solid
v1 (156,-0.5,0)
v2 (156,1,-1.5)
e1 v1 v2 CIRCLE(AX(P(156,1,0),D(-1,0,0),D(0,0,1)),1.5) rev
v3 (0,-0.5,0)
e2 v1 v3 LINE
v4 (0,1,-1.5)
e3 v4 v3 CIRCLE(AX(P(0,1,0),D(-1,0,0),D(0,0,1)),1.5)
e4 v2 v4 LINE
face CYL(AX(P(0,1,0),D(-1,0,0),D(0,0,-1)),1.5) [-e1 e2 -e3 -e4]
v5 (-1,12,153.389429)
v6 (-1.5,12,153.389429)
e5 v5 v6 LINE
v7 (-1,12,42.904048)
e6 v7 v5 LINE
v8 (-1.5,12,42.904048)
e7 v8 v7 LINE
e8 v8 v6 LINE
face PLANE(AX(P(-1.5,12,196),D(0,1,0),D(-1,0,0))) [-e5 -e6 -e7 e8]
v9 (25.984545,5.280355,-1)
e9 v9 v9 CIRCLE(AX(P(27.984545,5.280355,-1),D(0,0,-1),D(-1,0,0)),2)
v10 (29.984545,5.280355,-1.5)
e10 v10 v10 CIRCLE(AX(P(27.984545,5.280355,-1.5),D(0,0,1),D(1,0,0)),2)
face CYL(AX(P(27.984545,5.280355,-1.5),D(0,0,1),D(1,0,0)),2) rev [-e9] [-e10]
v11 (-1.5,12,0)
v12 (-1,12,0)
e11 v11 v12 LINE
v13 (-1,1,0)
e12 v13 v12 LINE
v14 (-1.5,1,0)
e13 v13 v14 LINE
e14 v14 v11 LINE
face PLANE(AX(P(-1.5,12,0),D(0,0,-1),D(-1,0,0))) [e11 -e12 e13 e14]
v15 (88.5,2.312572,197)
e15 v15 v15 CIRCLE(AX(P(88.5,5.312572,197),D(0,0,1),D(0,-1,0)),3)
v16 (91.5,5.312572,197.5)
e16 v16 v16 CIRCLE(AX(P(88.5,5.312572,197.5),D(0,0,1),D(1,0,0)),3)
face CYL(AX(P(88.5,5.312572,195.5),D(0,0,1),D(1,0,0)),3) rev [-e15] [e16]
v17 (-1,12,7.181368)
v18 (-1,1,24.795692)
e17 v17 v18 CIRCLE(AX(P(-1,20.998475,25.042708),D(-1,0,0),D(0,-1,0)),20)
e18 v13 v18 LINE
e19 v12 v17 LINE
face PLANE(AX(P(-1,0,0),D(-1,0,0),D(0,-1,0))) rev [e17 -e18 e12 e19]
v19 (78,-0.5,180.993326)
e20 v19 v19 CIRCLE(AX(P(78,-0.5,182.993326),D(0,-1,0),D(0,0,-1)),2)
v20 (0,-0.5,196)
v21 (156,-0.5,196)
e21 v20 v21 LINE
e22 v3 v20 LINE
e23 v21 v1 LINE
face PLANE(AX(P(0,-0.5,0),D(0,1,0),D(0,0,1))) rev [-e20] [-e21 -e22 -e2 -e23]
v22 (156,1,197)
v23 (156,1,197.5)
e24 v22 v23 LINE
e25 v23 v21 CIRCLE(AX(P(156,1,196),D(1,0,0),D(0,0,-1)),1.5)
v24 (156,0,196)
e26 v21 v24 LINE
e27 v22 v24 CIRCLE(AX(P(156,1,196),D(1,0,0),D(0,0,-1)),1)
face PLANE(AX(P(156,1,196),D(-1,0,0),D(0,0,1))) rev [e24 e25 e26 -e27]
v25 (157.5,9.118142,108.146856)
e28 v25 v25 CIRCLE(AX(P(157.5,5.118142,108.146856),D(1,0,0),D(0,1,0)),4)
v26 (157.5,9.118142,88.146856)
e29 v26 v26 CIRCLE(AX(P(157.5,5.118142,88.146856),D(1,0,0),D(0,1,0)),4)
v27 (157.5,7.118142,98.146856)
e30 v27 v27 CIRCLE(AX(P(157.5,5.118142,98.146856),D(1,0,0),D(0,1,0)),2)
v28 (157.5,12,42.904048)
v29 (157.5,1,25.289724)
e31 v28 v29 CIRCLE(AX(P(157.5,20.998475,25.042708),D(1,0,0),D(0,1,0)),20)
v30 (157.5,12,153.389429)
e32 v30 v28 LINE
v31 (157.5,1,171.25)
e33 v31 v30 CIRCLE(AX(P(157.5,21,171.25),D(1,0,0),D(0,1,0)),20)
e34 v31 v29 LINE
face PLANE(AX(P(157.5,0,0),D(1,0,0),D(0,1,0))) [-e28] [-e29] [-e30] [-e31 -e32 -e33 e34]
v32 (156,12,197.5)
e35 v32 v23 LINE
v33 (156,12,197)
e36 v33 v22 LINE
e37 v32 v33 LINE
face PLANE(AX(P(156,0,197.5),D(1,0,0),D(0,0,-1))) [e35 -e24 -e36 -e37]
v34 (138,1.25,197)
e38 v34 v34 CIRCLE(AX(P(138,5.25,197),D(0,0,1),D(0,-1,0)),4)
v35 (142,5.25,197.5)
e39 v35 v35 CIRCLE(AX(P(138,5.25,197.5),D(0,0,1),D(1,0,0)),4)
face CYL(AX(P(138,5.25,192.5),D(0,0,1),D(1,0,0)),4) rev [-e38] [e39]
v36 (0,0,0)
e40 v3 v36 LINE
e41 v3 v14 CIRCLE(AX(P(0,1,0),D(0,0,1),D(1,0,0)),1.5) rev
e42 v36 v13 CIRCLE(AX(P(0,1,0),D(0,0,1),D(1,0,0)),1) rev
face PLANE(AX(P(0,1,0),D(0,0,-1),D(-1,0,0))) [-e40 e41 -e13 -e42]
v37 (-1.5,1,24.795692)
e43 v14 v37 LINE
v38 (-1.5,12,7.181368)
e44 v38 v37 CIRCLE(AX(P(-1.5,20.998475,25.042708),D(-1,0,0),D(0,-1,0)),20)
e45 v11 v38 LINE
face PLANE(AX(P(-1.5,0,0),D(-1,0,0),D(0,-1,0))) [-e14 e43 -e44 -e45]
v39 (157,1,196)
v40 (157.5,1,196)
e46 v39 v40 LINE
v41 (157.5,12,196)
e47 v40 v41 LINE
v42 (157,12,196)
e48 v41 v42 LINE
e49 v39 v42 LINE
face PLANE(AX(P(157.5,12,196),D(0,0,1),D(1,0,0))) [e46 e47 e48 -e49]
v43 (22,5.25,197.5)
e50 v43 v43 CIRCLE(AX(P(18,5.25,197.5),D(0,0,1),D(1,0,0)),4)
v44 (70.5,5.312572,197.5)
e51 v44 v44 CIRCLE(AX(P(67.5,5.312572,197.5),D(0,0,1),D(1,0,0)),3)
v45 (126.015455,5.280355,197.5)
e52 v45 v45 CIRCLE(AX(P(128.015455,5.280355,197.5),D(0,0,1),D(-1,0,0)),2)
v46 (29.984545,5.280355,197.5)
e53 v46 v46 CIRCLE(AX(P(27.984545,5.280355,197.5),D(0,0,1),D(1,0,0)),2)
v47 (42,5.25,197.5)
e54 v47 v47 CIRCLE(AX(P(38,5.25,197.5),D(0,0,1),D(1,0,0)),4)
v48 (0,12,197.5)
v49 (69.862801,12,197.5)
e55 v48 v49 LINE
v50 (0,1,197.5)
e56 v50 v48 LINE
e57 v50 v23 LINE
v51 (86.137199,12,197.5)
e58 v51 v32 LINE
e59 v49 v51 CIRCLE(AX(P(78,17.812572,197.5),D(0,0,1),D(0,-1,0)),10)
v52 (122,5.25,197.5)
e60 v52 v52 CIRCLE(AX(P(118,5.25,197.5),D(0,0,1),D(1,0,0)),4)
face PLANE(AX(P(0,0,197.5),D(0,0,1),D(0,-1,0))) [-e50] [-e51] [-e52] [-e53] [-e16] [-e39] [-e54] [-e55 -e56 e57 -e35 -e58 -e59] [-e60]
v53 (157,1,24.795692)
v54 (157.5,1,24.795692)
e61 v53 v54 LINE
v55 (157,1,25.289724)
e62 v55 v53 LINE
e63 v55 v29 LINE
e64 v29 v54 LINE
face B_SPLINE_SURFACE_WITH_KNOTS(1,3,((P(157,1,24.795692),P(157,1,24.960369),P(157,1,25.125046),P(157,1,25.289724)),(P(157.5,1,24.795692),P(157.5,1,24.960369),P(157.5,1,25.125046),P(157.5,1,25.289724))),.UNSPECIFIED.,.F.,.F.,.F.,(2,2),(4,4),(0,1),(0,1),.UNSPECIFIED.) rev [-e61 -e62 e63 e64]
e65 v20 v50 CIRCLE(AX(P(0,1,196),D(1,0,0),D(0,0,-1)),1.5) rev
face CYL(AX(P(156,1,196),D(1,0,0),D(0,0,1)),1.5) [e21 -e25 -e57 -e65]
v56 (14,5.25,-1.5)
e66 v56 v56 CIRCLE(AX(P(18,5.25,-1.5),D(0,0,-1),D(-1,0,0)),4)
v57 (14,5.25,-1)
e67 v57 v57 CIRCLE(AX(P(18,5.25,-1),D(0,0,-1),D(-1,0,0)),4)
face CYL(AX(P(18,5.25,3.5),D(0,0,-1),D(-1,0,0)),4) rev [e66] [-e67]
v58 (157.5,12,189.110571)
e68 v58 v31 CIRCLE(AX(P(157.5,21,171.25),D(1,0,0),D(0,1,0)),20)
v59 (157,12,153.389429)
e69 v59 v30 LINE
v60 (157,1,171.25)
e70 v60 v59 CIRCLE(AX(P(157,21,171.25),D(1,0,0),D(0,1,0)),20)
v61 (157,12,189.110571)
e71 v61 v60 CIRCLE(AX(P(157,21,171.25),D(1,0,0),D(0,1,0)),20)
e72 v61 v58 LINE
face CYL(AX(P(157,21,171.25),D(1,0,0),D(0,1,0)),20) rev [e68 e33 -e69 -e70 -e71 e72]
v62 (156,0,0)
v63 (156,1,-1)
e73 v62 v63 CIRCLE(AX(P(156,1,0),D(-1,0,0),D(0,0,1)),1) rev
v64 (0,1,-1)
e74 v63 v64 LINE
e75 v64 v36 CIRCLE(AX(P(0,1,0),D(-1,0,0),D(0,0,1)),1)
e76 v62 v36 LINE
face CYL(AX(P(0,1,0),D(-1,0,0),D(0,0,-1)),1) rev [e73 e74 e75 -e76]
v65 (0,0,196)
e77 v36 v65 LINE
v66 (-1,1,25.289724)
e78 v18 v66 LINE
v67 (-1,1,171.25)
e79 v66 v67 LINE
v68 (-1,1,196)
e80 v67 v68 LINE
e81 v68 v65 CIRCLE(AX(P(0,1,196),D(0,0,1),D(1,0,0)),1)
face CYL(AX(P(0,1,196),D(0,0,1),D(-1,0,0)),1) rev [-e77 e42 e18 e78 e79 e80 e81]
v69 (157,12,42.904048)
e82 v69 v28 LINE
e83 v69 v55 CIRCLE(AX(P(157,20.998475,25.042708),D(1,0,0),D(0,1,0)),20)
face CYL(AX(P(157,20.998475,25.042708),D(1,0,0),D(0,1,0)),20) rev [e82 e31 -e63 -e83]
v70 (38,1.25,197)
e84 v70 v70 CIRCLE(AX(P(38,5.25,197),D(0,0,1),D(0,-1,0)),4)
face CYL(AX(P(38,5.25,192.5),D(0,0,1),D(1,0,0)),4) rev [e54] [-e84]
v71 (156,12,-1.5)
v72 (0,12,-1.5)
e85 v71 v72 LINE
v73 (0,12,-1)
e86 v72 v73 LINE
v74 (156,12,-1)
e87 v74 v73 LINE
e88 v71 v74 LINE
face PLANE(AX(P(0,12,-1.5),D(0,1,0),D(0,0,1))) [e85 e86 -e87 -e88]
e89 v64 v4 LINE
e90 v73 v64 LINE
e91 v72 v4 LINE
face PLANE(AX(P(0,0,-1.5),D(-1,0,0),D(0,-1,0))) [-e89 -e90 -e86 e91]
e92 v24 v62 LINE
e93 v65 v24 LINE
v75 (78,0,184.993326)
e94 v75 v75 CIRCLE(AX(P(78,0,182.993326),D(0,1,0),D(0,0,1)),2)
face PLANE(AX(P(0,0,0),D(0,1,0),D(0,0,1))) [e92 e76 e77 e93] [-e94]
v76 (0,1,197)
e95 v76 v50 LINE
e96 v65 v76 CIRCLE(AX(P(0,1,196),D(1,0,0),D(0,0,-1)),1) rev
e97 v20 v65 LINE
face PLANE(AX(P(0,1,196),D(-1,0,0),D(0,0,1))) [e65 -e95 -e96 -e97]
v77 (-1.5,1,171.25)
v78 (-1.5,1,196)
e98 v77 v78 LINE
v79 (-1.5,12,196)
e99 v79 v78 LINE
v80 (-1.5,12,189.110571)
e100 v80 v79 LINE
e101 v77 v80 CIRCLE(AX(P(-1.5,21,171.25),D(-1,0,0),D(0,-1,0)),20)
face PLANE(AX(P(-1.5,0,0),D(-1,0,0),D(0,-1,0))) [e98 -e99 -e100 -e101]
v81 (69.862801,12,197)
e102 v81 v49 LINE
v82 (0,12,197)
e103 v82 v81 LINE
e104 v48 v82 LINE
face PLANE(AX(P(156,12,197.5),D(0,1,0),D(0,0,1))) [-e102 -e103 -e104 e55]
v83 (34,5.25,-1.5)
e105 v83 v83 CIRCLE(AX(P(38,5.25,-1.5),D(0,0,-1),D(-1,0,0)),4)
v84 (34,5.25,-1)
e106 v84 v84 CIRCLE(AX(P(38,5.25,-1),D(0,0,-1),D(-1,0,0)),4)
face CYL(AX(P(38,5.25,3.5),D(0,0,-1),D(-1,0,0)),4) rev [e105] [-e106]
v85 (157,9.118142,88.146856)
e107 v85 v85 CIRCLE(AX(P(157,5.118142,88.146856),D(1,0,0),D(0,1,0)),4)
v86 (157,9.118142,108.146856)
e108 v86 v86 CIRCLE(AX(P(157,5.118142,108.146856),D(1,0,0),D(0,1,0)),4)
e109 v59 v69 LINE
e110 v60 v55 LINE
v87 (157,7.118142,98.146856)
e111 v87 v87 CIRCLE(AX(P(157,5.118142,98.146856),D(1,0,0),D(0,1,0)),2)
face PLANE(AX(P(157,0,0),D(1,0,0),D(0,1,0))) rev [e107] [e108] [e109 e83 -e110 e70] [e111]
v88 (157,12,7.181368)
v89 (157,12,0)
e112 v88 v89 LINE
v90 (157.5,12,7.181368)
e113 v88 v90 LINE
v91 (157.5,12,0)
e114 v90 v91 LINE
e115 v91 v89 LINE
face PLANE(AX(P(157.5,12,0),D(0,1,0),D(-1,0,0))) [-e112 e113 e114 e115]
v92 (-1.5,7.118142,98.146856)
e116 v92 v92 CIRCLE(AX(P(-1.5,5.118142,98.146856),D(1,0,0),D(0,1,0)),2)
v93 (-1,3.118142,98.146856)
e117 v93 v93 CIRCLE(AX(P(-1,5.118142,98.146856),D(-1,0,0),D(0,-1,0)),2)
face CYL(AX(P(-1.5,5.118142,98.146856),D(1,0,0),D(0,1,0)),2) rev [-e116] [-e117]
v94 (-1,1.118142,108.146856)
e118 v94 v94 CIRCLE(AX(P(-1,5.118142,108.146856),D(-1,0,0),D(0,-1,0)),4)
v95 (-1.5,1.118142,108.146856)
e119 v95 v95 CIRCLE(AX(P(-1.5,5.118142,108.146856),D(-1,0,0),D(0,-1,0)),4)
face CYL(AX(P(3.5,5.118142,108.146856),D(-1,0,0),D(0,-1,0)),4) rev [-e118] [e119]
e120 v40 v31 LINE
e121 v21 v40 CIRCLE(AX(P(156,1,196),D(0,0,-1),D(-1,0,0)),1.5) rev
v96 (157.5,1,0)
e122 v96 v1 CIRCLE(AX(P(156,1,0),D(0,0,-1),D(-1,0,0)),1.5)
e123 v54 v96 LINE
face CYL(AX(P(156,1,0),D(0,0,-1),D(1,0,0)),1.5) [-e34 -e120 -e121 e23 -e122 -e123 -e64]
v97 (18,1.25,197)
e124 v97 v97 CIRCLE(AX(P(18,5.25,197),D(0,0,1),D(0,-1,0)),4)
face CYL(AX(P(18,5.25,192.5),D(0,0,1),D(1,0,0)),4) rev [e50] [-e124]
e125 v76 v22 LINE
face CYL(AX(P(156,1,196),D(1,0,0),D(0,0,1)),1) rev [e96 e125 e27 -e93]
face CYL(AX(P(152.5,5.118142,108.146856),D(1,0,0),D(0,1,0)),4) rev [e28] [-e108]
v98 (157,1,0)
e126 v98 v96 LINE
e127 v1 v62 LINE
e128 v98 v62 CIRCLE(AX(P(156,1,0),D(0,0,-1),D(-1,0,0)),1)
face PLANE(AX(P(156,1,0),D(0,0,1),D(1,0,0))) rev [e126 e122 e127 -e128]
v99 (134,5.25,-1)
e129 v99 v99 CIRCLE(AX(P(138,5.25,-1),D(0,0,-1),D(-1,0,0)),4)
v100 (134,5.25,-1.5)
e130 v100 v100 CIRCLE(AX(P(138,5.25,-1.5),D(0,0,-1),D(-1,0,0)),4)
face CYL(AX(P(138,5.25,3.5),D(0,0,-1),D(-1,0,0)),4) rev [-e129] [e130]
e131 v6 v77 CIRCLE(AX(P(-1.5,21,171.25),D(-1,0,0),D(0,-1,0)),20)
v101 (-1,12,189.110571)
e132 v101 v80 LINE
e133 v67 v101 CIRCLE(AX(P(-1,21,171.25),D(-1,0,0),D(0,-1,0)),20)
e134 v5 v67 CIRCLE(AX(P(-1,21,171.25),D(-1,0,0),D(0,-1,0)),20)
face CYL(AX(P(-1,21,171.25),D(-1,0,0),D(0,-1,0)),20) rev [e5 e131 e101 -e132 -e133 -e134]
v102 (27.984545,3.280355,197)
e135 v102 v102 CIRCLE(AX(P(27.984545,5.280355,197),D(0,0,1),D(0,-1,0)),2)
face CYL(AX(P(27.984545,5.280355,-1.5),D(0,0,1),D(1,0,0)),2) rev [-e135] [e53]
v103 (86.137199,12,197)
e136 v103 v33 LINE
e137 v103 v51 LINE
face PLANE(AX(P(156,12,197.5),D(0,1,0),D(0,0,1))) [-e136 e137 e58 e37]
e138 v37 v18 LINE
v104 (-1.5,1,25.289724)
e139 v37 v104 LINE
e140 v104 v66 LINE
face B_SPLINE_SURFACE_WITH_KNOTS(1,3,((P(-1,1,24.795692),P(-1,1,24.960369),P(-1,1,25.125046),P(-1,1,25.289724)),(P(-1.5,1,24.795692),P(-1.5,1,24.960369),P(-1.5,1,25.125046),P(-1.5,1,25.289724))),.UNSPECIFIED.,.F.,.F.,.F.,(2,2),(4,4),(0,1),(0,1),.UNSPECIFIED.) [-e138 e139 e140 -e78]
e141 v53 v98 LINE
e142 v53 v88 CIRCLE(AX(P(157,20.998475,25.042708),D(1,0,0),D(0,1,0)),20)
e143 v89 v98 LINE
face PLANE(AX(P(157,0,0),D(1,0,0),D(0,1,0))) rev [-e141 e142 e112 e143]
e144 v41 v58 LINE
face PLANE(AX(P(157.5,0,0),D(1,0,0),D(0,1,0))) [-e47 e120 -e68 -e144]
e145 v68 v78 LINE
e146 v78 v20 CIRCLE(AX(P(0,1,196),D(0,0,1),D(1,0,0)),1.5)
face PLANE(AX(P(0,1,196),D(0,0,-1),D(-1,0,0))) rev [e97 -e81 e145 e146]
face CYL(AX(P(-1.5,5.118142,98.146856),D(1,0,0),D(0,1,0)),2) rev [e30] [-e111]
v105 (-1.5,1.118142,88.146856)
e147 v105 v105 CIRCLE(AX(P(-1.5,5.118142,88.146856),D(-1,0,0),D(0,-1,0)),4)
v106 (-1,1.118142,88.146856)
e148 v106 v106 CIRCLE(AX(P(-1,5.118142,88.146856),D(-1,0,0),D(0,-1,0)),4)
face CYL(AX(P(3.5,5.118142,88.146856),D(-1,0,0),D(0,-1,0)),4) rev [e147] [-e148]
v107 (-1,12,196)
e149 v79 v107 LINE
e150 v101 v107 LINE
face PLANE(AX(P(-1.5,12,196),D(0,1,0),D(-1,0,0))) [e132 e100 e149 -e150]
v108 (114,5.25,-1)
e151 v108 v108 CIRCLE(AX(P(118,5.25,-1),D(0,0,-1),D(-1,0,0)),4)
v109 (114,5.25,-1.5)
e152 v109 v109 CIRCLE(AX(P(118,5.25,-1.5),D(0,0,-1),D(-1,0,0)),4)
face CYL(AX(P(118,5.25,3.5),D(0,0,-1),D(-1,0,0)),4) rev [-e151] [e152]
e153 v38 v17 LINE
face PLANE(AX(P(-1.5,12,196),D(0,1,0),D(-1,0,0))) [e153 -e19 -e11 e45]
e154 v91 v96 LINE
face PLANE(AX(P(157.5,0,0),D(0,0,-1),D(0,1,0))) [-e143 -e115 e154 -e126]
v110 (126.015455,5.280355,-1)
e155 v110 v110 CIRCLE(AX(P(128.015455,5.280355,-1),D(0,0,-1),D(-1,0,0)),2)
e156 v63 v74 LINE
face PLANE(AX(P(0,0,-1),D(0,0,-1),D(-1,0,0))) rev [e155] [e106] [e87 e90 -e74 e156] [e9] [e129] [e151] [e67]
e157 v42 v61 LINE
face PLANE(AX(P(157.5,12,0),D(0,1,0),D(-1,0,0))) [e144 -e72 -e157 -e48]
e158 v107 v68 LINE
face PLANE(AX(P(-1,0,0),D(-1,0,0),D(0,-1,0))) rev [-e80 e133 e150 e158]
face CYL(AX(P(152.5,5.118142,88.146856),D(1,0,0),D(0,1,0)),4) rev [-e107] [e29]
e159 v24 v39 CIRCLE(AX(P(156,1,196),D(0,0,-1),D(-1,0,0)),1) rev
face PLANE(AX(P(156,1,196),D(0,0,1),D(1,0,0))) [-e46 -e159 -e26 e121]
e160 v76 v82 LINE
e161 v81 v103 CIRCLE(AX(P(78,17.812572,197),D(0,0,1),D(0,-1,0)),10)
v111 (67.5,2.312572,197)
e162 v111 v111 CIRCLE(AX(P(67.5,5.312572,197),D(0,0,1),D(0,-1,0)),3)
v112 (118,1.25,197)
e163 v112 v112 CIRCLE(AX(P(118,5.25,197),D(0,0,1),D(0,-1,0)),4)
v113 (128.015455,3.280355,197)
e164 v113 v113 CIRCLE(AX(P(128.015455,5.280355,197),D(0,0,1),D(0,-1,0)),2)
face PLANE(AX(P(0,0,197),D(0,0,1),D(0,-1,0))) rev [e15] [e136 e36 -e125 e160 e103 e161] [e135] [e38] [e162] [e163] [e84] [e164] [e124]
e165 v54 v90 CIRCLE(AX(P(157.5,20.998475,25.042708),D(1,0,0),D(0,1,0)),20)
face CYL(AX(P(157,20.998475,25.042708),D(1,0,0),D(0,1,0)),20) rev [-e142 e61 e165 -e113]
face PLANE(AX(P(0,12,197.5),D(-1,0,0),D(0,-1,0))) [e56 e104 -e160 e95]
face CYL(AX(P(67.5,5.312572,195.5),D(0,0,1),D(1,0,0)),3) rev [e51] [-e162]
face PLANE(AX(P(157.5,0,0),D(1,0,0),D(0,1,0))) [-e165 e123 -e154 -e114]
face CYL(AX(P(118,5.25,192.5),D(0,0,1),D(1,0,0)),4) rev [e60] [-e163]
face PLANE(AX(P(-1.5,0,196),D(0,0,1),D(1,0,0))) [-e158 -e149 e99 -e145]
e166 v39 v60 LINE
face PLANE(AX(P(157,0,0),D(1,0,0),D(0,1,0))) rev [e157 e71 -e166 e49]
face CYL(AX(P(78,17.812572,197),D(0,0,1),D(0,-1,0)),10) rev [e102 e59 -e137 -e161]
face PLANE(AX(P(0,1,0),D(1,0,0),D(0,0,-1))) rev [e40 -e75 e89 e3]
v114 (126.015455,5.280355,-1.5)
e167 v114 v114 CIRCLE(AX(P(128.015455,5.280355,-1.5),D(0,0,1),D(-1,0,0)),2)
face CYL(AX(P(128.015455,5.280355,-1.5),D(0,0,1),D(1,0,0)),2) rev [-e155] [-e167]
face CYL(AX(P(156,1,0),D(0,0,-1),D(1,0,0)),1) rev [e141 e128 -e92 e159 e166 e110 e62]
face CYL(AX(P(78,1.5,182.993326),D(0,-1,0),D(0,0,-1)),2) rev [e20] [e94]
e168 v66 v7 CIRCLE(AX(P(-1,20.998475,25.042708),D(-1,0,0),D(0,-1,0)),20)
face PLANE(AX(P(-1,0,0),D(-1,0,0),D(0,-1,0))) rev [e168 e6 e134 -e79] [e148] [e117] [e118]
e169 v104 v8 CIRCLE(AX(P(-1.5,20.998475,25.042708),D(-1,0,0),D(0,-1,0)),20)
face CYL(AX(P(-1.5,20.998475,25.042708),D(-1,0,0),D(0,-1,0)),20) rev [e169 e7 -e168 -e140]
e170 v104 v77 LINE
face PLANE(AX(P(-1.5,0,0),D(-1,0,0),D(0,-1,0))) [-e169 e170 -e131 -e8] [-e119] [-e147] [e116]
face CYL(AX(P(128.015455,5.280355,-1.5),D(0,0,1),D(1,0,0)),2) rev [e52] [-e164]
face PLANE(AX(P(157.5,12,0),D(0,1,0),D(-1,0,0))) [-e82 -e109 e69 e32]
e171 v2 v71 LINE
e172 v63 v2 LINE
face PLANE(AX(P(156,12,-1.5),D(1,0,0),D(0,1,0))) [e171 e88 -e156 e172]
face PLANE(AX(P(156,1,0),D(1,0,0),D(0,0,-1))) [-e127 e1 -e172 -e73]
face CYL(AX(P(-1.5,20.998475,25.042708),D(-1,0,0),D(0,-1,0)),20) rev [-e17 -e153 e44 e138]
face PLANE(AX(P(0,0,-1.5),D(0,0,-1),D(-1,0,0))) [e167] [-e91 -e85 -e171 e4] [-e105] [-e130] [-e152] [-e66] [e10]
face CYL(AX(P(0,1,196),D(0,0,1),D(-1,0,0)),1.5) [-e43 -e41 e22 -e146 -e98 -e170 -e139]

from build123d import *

# Parameters (mm, degrees)
SKETCH1_W           = 156
SKETCH1_H           = 196
BASE_FLANGE1_DEPTH  = 0.5
EDGE_FLANGE1_DEPTH  = 196
EDGE_FLANGE2_DEPTH  = 156
EDGE_FLANGE3_DEPTH  = 196
EDGE_FLANGE4_DEPTH  = 156
SKETCH14_R          = 3
CUT_EXTRUDE1_DEPTH  = 2
CUT_EXTRUDE2_START  = -0.5
CUT_EXTRUDE2_DEPTH  = 0.5
CUT_EXTRUDE7_START  = -0.5
CUT_EXTRUDE7_DEPTH  = 0.5
SKETCH18_R          = 2
CUT_EXTRUDE8_DEPTH  = 254.83311453
SKETCH19_R          = 2
CUT_EXTRUDE9_DEPTH  = 255.06938035
SKETCH20_R          = 4
CUT_EXTRUDE10_DEPTH = 5
CUT_EXTRUDE11_START = -5
SKETCH21_R          = 4
CUT_EXTRUDE11_DEPTH = 5
SKETCH22_R          = 4
CUT_EXTRUDE12_DEPTH = 5
CUT_EXTRUDE13_START = -5
SKETCH23_R          = 4
CUT_EXTRUDE13_DEPTH = 5
SKETCH24_R          = 10
CUT_EXTRUDE14_DEPTH = 1
SKETCH25_R          = 2
CUT_EXTRUDE15_DEPTH = 2


# Read off the part's stored shape, not the designer's step: Cut-Extrude2, Cut-Extrude7
# Sheet-metal steps are written as plain solids
with BuildPart() as part:
    # Sketch1 → Base-Flange1 (new body)
    with BuildSketch(Plane(origin=(0, 0, 0), x_dir=(1, 0, 0), z_dir=(0, 1, 0))):
        with Locations((78, -98)):
            Rectangle(SKETCH1_W, SKETCH1_H)
    extrude(amount=-BASE_FLANGE1_DEPTH)

    # Edge-Flange1 section (across the edge) → Edge-Flange1 (add)
    with BuildSketch(Plane(origin=(-1, 0, 0), x_dir=(1, 0, 0), z_dir=(0, 0, 1))):
        with BuildLine():
            Line((-0.5, 1), (-0.5, 12))
            Line((-0.5, 12), (0, 12))
            Line((0, 12), (0, 1))
            ThreePointArc((0, 1), (0.292893219, 0.292893219), (1, 0))
            Line((1, 0), (1, -0.5))
            ThreePointArc((1, -0.5), (-0.060660172, -0.060660172), (-0.5, 1))
        make_face()
    extrude(amount=EDGE_FLANGE1_DEPTH)

    # Edge-Flange2 section (across the edge) → Edge-Flange2 (add)
    with BuildSketch(Plane(origin=(0, 0, 197), x_dir=(0, 0, -1), z_dir=(1, 0, 0))):
        with BuildLine():
            Line((-0.5, 1), (-0.5, 12))
            Line((-0.5, 12), (0, 12))
            Line((0, 12), (0, 1))
            ThreePointArc((0, 1), (0.292893219, 0.292893219), (1, 0))
            Line((1, 0), (1, -0.5))
            ThreePointArc((1, -0.5), (-0.060660172, -0.060660172), (-0.5, 1))
        make_face()
    extrude(amount=EDGE_FLANGE2_DEPTH)

    # Edge-Flange3 section (across the edge) → Edge-Flange3 (add)
    with BuildSketch(Plane(origin=(157, 0, 196), x_dir=(-1, 0, 0), z_dir=(0, 0, -1))):
        with BuildLine():
            Line((-0.5, 1), (-0.5, 12))
            Line((-0.5, 12), (0, 12))
            Line((0, 12), (0, 1))
            ThreePointArc((0, 1), (0.292893219, 0.292893219), (1, 0))
            Line((1, 0), (1, -0.5))
            ThreePointArc((1, -0.5), (-0.060660172, -0.060660172), (-0.5, 1))
        make_face()
    extrude(amount=EDGE_FLANGE3_DEPTH)

    # Edge-Flange4 section (across the edge) → Edge-Flange4 (add)
    with BuildSketch(Plane(origin=(156, 0, -1), x_dir=(0, 0, 1), z_dir=(-1, 0, 0))):
        with BuildLine():
            Line((-0.5, 1), (-0.5, 12))
            Line((-0.5, 12), (0, 12))
            Line((0, 12), (0, 1))
            ThreePointArc((0, 1), (0.292893219, 0.292893219), (1, 0))
            Line((1, 0), (1, -0.5))
            ThreePointArc((1, -0.5), (-0.060660172, -0.060660172), (-0.5, 1))
        make_face()
    extrude(amount=EDGE_FLANGE4_DEPTH)

    # Sketch14 → Cut-Extrude1 (cut)
    with BuildSketch(Plane.XY.offset(197.5)):
        with Locations((88.5, 5.312571767)):
            Circle(SKETCH14_R)
        with Locations((67.5, 5.312571767)):
            Circle(SKETCH14_R)
    extrude(amount=-CUT_EXTRUDE1_DEPTH, mode=Mode.SUBTRACT)

    # Cut-Extrude2 outline → Cut-Extrude2 (cut)
    with BuildSketch(Plane.ZY.offset(1.5).offset(CUT_EXTRUDE2_START)):
        with BuildLine():
            ThreePointArc((7.181368129, 12), (14.44892966, 4.034634629), (24.795691895, 1))
            add(Edge.make_bspline(
                [(24.795691895, 1), (24.960369193, 1), (25.12504649, 1), (25.289723788, 1)],
                knots=[0, 0, 0, 0, 1, 1, 1, 1], degree=3))
            ThreePointArc((25.289723788, 1), (35.636486024, 4.034634629), (42.904047554, 12))
            Line((42.904047554, 12), (7.181368129, 12))
        make_face()
        with BuildLine():
            Line((189.110571099, 12), (153.389428901, 12))
            ThreePointArc((153.389428901, 12), (171.25, 1), (189.110571099, 12))
        make_face()
    extrude(amount=CUT_EXTRUDE2_DEPTH, mode=Mode.SUBTRACT)

    # Cut-Extrude7 outline → Cut-Extrude7 (cut)
    with BuildSketch(Plane(origin=(157.5, 0, 0), x_dir=(0, 0, -1), z_dir=(1, 0, 0)).offset(CUT_EXTRUDE7_START)):
        with BuildLine():
            ThreePointArc((-189.110571099, 12), (-171.25, 1), (-153.389428901, 12))
            Line((-153.389428901, 12), (-189.110571099, 12))
        make_face()
        with BuildLine():
            add(Edge.make_bspline(
                [(-24.795691895, 1), (-24.960369193, 1), (-25.12504649, 1), (-25.289723788, 1)],
                knots=[0, 0, 0, 0, 1, 1, 1, 1], degree=3))
            ThreePointArc((-24.795691895, 1), (-14.44892966, 4.034634629), (-7.181368129, 12))
            Line((-7.181368129, 12), (-42.904047554, 12))
            ThreePointArc((-42.904047554, 12), (-35.636486024, 4.034634629), (-25.289723788, 1))
        make_face()
    extrude(amount=CUT_EXTRUDE7_DEPTH, mode=Mode.SUBTRACT)

    # Sketch18 → Cut-Extrude8 (cut, through all)
    with BuildSketch(Plane(origin=(157.5, 0, 0), x_dir=(0, 0, -1), z_dir=(1, 0, 0))):
        with Locations(Location((-98.146856175, 5.118141575, 0), (0, 0, 90))):
            Circle(SKETCH18_R)
    extrude(amount=-CUT_EXTRUDE8_DEPTH, mode=Mode.SUBTRACT)

    # Sketch19 → Cut-Extrude9 (cut, through all)
    with BuildSketch(Plane.XY.offset(197.5)):
        with Locations((27.98454493, 5.280354993)):
            Circle(SKETCH19_R)
        with Locations(Location((128.01545507, 5.280354993, 0), (0, 0, 180))):
            Circle(SKETCH19_R)
    extrude(amount=-CUT_EXTRUDE9_DEPTH, mode=Mode.SUBTRACT)

    # Sketch20 → Cut-Extrude10 (cut)
    with BuildSketch(Plane(origin=(157.5, 0, 0), x_dir=(0, 0, -1), z_dir=(1, 0, 0))):
        with Locations(Location((-88.146856175, 5.118141575, 0), (0, 0, 90))):
            Circle(SKETCH20_R)
        with Locations(Location((-108.146856175, 5.118141575, 0), (0, 0, 90))):
            Circle(SKETCH20_R)
    extrude(amount=-CUT_EXTRUDE10_DEPTH, mode=Mode.SUBTRACT)

    # Sketch21 → Cut-Extrude11 (cut)
    with BuildSketch(Plane.ZY.offset(1.5).offset(CUT_EXTRUDE11_START)):
        with Locations(Location((88.146856175, 5.118141575, 0), (0, 0, 90))):
            Circle(SKETCH21_R)
        with Locations(Location((108.146856175, 5.118141575, 0), (0, 0, 90))):
            Circle(SKETCH21_R)
    extrude(amount=CUT_EXTRUDE11_DEPTH, mode=Mode.SUBTRACT)

    # Sketch22 → Cut-Extrude12 (cut)
    with BuildSketch(Plane.XY.offset(197.5)):
        with Locations((138, 5.25)):
            Circle(SKETCH22_R)
        with Locations((118, 5.25)):
            Circle(SKETCH22_R)
        with Locations((38, 5.25)):
            Circle(SKETCH22_R)
        with Locations((18, 5.25)):
            Circle(SKETCH22_R)
    extrude(amount=-CUT_EXTRUDE12_DEPTH, mode=Mode.SUBTRACT)

    # Sketch23 → Cut-Extrude13 (cut)
    with BuildSketch(Plane(origin=(0, 0, -1.5), x_dir=(-1, 0, 0), z_dir=(0, 0, -1)).offset(CUT_EXTRUDE13_START)):
        with Locations(Location((-18, 5.25, 0), (0, 0, 180))):
            Circle(SKETCH23_R)
        with Locations(Location((-38, 5.25, 0), (0, 0, 180))):
            Circle(SKETCH23_R)
        with Locations(Location((-118, 5.25, 0), (0, 0, 180))):
            Circle(SKETCH23_R)
        with Locations(Location((-138, 5.25, 0), (0, 0, 180))):
            Circle(SKETCH23_R)
    extrude(amount=CUT_EXTRUDE13_DEPTH, mode=Mode.SUBTRACT)

    # Sketch24 → Cut-Extrude14 (cut)
    with BuildSketch(Plane.XY.offset(197.5)):
        with Locations((78, 17.812571767)):
            Circle(SKETCH24_R)
    extrude(amount=-CUT_EXTRUDE14_DEPTH, mode=Mode.SUBTRACT)

    # Sketch25 → Cut-Extrude15 (cut)
    with BuildSketch(Plane.XZ.offset(0.5)):
        with Locations(Location((78, 182.993325715, 0), (0, 0, 270))):
            Circle(SKETCH25_R)
    extrude(amount=-CUT_EXTRUDE15_DEPTH, mode=Mode.SUBTRACT)


solid = part.part
